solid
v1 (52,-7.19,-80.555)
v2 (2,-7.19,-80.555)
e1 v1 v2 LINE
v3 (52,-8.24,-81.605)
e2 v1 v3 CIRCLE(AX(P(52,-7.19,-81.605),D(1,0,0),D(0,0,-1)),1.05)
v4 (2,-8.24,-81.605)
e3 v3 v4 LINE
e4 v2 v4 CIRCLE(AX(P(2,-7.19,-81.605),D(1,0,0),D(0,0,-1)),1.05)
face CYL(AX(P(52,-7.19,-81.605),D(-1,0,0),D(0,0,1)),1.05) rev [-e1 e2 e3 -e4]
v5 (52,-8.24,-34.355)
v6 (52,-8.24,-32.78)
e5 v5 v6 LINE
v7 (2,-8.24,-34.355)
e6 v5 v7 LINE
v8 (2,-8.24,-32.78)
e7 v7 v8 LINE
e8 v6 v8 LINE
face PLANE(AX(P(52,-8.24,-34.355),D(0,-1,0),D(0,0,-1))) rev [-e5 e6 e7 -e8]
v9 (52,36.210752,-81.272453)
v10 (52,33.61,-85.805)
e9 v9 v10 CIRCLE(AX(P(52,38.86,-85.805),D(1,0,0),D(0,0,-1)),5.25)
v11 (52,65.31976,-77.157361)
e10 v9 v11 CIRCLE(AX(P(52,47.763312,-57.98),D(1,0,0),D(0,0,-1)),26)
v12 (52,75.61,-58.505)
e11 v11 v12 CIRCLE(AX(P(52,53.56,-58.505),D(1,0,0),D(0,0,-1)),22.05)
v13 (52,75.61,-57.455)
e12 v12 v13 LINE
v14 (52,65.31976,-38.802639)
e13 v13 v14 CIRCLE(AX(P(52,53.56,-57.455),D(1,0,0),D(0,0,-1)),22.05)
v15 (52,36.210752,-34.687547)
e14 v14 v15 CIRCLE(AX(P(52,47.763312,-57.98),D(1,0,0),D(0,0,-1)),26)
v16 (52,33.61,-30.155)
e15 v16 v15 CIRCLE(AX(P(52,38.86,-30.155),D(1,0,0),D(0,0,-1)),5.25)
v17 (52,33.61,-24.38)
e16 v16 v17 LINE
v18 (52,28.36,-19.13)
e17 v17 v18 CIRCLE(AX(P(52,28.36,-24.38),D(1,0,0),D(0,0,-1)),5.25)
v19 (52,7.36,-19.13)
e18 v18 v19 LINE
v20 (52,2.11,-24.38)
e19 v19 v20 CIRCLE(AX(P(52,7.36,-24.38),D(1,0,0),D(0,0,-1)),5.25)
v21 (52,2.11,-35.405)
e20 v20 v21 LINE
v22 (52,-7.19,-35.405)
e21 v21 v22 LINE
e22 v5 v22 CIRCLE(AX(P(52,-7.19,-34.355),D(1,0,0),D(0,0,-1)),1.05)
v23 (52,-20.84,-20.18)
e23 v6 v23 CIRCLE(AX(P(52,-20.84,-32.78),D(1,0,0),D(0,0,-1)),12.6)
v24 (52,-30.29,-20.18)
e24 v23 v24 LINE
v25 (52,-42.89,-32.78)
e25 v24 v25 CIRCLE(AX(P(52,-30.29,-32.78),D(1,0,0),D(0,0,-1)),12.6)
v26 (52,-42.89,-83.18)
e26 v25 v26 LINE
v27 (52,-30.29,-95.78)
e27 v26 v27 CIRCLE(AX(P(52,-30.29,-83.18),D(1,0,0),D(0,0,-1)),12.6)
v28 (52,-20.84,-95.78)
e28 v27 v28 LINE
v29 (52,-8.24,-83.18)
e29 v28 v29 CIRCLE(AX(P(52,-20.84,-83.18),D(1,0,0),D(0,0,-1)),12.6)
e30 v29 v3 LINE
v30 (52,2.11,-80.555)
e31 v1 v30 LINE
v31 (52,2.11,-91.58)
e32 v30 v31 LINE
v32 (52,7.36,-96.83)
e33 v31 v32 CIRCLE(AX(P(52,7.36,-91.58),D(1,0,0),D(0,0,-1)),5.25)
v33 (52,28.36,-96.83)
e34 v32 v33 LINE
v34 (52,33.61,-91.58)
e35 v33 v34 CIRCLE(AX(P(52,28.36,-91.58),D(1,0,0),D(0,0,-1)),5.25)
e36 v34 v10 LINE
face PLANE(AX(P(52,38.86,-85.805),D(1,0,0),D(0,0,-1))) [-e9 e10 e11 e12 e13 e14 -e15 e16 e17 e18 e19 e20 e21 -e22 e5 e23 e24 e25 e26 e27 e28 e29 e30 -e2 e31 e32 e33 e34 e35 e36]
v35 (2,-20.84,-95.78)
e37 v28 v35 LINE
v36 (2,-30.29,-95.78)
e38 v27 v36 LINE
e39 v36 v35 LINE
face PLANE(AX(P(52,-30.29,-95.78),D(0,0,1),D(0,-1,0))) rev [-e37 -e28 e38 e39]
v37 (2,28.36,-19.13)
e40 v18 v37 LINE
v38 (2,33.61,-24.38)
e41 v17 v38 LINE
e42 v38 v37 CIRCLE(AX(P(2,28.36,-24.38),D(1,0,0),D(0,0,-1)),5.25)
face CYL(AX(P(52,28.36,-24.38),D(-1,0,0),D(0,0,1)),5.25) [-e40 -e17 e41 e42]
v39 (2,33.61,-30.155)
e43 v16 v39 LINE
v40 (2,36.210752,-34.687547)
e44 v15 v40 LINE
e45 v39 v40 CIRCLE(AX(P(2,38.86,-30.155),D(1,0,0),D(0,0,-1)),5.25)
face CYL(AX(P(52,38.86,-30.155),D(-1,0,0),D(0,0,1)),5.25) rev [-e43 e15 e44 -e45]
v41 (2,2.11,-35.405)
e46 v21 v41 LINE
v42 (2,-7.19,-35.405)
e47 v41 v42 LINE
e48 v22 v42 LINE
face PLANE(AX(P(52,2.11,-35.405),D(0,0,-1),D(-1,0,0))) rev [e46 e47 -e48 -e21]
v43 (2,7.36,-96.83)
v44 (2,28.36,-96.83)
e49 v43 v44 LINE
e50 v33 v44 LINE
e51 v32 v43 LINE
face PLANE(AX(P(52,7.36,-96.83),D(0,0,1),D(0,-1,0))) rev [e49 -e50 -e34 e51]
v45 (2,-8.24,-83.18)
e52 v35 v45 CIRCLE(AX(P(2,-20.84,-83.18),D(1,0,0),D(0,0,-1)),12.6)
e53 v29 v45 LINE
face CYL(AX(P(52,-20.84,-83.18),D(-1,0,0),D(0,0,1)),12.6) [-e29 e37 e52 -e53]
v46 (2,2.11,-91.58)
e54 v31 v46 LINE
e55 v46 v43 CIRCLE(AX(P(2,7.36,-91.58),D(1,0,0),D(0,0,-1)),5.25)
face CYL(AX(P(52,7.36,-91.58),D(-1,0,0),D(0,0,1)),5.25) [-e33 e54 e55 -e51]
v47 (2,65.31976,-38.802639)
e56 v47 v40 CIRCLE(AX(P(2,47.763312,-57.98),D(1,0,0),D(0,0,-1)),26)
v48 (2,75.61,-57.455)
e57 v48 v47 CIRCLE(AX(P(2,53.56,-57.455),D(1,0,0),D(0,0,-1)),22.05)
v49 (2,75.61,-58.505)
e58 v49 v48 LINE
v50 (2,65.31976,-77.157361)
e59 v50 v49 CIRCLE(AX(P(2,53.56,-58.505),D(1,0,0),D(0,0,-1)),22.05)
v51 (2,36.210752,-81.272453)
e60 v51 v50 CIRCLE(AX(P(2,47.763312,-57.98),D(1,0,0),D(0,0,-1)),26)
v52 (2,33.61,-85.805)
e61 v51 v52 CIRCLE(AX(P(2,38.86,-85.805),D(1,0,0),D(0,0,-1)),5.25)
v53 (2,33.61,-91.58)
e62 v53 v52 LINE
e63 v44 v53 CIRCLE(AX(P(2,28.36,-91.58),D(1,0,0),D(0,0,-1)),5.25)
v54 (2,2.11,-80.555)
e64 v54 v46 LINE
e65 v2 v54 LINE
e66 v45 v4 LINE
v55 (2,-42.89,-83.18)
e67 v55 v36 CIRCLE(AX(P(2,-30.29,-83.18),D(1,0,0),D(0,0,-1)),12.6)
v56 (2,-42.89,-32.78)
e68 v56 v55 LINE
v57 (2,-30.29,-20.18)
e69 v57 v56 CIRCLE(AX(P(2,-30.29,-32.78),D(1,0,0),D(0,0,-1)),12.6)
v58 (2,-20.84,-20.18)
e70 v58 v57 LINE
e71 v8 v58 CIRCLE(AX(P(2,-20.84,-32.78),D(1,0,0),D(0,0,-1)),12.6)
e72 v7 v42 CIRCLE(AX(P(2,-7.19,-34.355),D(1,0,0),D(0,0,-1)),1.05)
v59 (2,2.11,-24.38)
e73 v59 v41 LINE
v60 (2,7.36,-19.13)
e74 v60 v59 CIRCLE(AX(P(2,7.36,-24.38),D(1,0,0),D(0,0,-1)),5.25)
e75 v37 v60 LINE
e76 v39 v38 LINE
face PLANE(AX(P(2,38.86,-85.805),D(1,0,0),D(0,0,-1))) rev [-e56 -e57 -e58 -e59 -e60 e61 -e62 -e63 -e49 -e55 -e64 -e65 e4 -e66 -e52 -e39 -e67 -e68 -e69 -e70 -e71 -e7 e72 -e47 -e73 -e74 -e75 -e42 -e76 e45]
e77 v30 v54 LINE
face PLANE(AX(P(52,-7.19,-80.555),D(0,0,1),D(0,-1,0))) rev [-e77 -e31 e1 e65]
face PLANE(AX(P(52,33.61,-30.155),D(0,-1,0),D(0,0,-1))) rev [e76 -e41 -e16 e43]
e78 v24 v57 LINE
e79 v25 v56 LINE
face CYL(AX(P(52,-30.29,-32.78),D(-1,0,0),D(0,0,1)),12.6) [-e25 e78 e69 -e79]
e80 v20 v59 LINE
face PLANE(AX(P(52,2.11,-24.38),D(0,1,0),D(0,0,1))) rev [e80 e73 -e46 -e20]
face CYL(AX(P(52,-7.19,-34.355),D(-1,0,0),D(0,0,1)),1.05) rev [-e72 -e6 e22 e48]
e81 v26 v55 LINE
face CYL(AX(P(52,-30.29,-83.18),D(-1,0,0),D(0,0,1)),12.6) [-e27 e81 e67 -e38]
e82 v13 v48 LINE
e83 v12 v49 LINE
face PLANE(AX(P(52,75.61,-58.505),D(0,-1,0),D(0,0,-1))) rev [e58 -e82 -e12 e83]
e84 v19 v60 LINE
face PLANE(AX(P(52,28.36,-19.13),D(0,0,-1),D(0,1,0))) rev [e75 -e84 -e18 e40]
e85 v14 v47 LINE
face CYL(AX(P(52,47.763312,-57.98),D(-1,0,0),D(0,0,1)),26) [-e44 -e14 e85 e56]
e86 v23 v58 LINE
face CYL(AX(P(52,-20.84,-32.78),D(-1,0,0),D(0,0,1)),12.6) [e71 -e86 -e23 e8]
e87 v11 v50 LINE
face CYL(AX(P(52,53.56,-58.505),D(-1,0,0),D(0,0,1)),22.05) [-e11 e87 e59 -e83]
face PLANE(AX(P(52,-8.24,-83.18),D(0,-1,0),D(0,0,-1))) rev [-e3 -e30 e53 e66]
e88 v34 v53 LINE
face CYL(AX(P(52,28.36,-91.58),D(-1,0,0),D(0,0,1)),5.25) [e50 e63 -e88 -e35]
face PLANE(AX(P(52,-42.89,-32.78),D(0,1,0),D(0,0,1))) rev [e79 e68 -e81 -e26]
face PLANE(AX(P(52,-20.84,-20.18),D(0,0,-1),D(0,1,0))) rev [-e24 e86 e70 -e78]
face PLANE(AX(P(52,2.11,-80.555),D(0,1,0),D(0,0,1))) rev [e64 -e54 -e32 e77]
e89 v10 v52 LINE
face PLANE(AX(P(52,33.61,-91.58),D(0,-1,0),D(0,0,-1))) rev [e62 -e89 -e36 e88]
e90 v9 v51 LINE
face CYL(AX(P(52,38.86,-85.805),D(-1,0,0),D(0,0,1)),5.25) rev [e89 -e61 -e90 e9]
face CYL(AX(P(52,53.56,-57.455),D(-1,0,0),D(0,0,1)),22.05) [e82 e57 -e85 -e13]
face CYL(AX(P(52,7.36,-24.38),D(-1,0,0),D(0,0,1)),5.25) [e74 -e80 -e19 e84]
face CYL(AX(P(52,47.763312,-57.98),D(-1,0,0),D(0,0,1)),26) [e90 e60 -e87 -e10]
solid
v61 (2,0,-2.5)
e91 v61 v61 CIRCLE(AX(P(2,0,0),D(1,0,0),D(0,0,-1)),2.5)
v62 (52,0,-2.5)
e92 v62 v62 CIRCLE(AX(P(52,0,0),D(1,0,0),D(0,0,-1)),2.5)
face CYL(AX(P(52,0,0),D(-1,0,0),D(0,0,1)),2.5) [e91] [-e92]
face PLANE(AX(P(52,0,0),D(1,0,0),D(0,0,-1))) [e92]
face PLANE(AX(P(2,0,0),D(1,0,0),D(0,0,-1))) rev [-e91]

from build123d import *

# Parameters (mm, degrees)
SKETCH1_R             = 101.87
SKETCH1_R_2           = 11
BOSS_EXTRUDE1_DEPTH   = 2
CUT_EXTRUDE1_START    = -2
CUT_EXTRUDE1_DEPTH    = 2
CUT_EXTRUDE2_START    = -2
CUT_EXTRUDE2_DEPTH    = 2
SKETCH4_R             = 26
CUT_EXTRUDE3_DEPTH    = 2
SKETCH5_R             = 2.5
BOSS_EXTRUDE2_DEPTH   = 50
BOSS_EXTRUDE2_2_DEPTH = 50


# Read off the part's stored shape, not the designer's step: Cut-Extrude1, Cut-Extrude2
with BuildPart() as part:
    # Sketch1 → Boss-Extrude1 (new body)
    with BuildSketch(Plane(origin=(0, 0, 0), x_dir=(0, 0, -1), z_dir=(1, 0, 0))):
        Circle(SKETCH1_R)
        Circle(SKETCH1_R_2, mode=Mode.SUBTRACT)
    extrude(amount=BOSS_EXTRUDE1_DEPTH)

    # Cut-Extrude1 outline → Cut-Extrude1 (cut)
    with BuildSketch(Plane(origin=(2, 0, 0), x_dir=(0, 0, -1), z_dir=(1, 0, 0)).offset(CUT_EXTRUDE1_START)):
        with BuildLine():
            Line((96.83, 7.36), (96.83, 28.36))
            ThreePointArc((96.83, 28.36), (95.292310601, 32.072310601), (91.58, 33.61))
            Line((91.58, 33.61), (85.805, 33.61))
            ThreePointArc((85.805, 33.61), (82.092689399, 35.147689399), (80.555, 38.86))
            Line((80.555, 38.86), (80.555, 53.56))
            ThreePointArc((80.555, 53.56), (74.096704525, 69.151704525), (58.505, 75.61))
            Line((58.505, 75.61), (57.455, 75.61))
            ThreePointArc((57.455, 75.61), (41.863295475, 69.151704525), (35.405, 53.56))
            Line((35.405, 53.56), (35.405, 38.86))
            ThreePointArc((35.405, 38.86), (33.867310601, 35.147689399), (30.155, 33.61))
            Line((30.155, 33.61), (24.38, 33.61))
            ThreePointArc((24.38, 33.61), (20.667689399, 32.072310601), (19.13, 28.36))
            Line((19.13, 28.36), (19.13, 7.36))
            ThreePointArc((19.13, 7.36), (20.667689399, 3.647689399), (24.38, 2.11))
            Line((24.38, 2.11), (91.58, 2.11))
            ThreePointArc((91.58, 2.11), (95.292310601, 3.647689399), (96.83, 7.36))
        make_face()
    extrude(amount=CUT_EXTRUDE1_DEPTH, mode=Mode.SUBTRACT)

    # Cut-Extrude2 outline → Cut-Extrude2 (cut)
    with BuildSketch(Plane(origin=(2, 0, 0), x_dir=(0, 0, -1), z_dir=(1, 0, 0)).offset(CUT_EXTRUDE2_START)):
        with BuildLine():
            Line((80.555, 2.11), (35.405, 2.11))
            Line((35.405, 2.11), (35.405, -7.19))
            ThreePointArc((35.405, -7.19), (35.09746212, -7.93246212), (34.355, -8.24))
            Line((34.355, -8.24), (32.78, -8.24))
            ThreePointArc((32.78, -8.24), (23.870454557, -11.930454557), (20.18, -20.84))
            Line((20.18, -20.84), (20.18, -30.29))
            ThreePointArc((20.18, -30.29), (23.870454557, -39.199545443), (32.78, -42.89))
            Line((32.78, -42.89), (83.18, -42.89))
            ThreePointArc((83.18, -42.89), (92.089545443, -39.199545443), (95.78, -30.29))
            Line((95.78, -30.29), (95.78, -20.84))
            ThreePointArc((95.78, -20.84), (92.089545443, -11.930454557), (83.18, -8.24))
            Line((83.18, -8.24), (81.605, -8.24))
            ThreePointArc((81.605, -8.24), (80.86253788, -7.93246212), (80.555, -7.19))
            Line((80.555, -7.19), (80.555, 2.11))
        make_face()
    extrude(amount=CUT_EXTRUDE2_DEPTH, mode=Mode.SUBTRACT)

    # Sketch4 → Cut-Extrude3 (cut)
    with BuildSketch(Plane(origin=(2, 0, 0), x_dir=(0, 0, -1), z_dir=(1, 0, 0))):
        with Locations((57.98, 47.76331228)):
            Circle(SKETCH4_R)
    extrude(amount=-CUT_EXTRUDE3_DEPTH, mode=Mode.SUBTRACT)


with BuildPart() as body_2:
    # Sketch5 → Boss-Extrude2 (new body)
    with BuildSketch(Plane(origin=(2, 0, 0), x_dir=(0, 0, -1), z_dir=(1, 0, 0))):
        Circle(SKETCH5_R)
    extrude(amount=BOSS_EXTRUDE2_DEPTH)


with BuildPart() as body_3:
    # Sketch5 → Boss-Extrude2 2 (new body)
    with BuildSketch(Plane(origin=(2, 0, 0), x_dir=(0, 0, -1), z_dir=(1, 0, 0))):
        with BuildLine():
            ThreePointArc((81.272452679, 36.210752035), (83.724025312, 51.402702438), (77.157360564, 65.31975958))
            ThreePointArc((77.157360564, 65.31975958), (69.156286337, 72.866801894), (58.505, 75.61))
            Line((58.505, 75.61), (57.455, 75.61))
            ThreePointArc((57.455, 75.61), (46.803713663, 72.866801894), (38.802639436, 65.31975958))
            ThreePointArc((38.802639436, 65.31975958), (32.235974688, 51.402702438), (34.687547321, 36.210752035))
            ThreePointArc((34.687547321, 36.210752035), (32.767847889, 34.306372226), (30.155, 33.61))
            Line((30.155, 33.61), (24.38, 33.61))
            ThreePointArc((24.38, 33.61), (20.667689399, 32.072310601), (19.13, 28.36))
            Line((19.13, 28.36), (19.13, 7.36))
            ThreePointArc((19.13, 7.36), (20.667689399, 3.647689399), (24.38, 2.11))
            Line((24.38, 2.11), (35.405, 2.11))
            Line((35.405, 2.11), (35.405, -7.19))
            ThreePointArc((35.405, -7.19), (35.09746212, -7.93246212), (34.355, -8.24))
            Line((34.355, -8.24), (32.78, -8.24))
            ThreePointArc((32.78, -8.24), (23.870454557, -11.930454557), (20.18, -20.84))
            Line((20.18, -20.84), (20.18, -30.29))
            ThreePointArc((20.18, -30.29), (23.870454557, -39.199545443), (32.78, -42.89))
            Line((32.78, -42.89), (83.18, -42.89))
            ThreePointArc((83.18, -42.89), (92.089545443, -39.199545443), (95.78, -30.29))
            Line((95.78, -30.29), (95.78, -20.84))
            ThreePointArc((95.78, -20.84), (92.089545443, -11.930454557), (83.18, -8.24))
            Line((83.18, -8.24), (81.605, -8.24))
            ThreePointArc((81.605, -8.24), (80.86253788, -7.93246212), (80.555, -7.19))
            Line((80.555, -7.19), (80.555, 2.11))
            Line((80.555, 2.11), (91.58, 2.11))
            ThreePointArc((91.58, 2.11), (95.292310601, 3.647689399), (96.83, 7.36))
            Line((96.83, 7.36), (96.83, 28.36))
            ThreePointArc((96.83, 28.36), (95.292310601, 32.072310601), (91.58, 33.61))
            Line((91.58, 33.61), (85.805, 33.61))
            ThreePointArc((85.805, 33.61), (83.192152111, 34.306372226), (81.272452679, 36.210752035))
        make_face()
    extrude(amount=BOSS_EXTRUDE2_2_DEPTH)


solid = Compound([body_2.part, body_3.part])
